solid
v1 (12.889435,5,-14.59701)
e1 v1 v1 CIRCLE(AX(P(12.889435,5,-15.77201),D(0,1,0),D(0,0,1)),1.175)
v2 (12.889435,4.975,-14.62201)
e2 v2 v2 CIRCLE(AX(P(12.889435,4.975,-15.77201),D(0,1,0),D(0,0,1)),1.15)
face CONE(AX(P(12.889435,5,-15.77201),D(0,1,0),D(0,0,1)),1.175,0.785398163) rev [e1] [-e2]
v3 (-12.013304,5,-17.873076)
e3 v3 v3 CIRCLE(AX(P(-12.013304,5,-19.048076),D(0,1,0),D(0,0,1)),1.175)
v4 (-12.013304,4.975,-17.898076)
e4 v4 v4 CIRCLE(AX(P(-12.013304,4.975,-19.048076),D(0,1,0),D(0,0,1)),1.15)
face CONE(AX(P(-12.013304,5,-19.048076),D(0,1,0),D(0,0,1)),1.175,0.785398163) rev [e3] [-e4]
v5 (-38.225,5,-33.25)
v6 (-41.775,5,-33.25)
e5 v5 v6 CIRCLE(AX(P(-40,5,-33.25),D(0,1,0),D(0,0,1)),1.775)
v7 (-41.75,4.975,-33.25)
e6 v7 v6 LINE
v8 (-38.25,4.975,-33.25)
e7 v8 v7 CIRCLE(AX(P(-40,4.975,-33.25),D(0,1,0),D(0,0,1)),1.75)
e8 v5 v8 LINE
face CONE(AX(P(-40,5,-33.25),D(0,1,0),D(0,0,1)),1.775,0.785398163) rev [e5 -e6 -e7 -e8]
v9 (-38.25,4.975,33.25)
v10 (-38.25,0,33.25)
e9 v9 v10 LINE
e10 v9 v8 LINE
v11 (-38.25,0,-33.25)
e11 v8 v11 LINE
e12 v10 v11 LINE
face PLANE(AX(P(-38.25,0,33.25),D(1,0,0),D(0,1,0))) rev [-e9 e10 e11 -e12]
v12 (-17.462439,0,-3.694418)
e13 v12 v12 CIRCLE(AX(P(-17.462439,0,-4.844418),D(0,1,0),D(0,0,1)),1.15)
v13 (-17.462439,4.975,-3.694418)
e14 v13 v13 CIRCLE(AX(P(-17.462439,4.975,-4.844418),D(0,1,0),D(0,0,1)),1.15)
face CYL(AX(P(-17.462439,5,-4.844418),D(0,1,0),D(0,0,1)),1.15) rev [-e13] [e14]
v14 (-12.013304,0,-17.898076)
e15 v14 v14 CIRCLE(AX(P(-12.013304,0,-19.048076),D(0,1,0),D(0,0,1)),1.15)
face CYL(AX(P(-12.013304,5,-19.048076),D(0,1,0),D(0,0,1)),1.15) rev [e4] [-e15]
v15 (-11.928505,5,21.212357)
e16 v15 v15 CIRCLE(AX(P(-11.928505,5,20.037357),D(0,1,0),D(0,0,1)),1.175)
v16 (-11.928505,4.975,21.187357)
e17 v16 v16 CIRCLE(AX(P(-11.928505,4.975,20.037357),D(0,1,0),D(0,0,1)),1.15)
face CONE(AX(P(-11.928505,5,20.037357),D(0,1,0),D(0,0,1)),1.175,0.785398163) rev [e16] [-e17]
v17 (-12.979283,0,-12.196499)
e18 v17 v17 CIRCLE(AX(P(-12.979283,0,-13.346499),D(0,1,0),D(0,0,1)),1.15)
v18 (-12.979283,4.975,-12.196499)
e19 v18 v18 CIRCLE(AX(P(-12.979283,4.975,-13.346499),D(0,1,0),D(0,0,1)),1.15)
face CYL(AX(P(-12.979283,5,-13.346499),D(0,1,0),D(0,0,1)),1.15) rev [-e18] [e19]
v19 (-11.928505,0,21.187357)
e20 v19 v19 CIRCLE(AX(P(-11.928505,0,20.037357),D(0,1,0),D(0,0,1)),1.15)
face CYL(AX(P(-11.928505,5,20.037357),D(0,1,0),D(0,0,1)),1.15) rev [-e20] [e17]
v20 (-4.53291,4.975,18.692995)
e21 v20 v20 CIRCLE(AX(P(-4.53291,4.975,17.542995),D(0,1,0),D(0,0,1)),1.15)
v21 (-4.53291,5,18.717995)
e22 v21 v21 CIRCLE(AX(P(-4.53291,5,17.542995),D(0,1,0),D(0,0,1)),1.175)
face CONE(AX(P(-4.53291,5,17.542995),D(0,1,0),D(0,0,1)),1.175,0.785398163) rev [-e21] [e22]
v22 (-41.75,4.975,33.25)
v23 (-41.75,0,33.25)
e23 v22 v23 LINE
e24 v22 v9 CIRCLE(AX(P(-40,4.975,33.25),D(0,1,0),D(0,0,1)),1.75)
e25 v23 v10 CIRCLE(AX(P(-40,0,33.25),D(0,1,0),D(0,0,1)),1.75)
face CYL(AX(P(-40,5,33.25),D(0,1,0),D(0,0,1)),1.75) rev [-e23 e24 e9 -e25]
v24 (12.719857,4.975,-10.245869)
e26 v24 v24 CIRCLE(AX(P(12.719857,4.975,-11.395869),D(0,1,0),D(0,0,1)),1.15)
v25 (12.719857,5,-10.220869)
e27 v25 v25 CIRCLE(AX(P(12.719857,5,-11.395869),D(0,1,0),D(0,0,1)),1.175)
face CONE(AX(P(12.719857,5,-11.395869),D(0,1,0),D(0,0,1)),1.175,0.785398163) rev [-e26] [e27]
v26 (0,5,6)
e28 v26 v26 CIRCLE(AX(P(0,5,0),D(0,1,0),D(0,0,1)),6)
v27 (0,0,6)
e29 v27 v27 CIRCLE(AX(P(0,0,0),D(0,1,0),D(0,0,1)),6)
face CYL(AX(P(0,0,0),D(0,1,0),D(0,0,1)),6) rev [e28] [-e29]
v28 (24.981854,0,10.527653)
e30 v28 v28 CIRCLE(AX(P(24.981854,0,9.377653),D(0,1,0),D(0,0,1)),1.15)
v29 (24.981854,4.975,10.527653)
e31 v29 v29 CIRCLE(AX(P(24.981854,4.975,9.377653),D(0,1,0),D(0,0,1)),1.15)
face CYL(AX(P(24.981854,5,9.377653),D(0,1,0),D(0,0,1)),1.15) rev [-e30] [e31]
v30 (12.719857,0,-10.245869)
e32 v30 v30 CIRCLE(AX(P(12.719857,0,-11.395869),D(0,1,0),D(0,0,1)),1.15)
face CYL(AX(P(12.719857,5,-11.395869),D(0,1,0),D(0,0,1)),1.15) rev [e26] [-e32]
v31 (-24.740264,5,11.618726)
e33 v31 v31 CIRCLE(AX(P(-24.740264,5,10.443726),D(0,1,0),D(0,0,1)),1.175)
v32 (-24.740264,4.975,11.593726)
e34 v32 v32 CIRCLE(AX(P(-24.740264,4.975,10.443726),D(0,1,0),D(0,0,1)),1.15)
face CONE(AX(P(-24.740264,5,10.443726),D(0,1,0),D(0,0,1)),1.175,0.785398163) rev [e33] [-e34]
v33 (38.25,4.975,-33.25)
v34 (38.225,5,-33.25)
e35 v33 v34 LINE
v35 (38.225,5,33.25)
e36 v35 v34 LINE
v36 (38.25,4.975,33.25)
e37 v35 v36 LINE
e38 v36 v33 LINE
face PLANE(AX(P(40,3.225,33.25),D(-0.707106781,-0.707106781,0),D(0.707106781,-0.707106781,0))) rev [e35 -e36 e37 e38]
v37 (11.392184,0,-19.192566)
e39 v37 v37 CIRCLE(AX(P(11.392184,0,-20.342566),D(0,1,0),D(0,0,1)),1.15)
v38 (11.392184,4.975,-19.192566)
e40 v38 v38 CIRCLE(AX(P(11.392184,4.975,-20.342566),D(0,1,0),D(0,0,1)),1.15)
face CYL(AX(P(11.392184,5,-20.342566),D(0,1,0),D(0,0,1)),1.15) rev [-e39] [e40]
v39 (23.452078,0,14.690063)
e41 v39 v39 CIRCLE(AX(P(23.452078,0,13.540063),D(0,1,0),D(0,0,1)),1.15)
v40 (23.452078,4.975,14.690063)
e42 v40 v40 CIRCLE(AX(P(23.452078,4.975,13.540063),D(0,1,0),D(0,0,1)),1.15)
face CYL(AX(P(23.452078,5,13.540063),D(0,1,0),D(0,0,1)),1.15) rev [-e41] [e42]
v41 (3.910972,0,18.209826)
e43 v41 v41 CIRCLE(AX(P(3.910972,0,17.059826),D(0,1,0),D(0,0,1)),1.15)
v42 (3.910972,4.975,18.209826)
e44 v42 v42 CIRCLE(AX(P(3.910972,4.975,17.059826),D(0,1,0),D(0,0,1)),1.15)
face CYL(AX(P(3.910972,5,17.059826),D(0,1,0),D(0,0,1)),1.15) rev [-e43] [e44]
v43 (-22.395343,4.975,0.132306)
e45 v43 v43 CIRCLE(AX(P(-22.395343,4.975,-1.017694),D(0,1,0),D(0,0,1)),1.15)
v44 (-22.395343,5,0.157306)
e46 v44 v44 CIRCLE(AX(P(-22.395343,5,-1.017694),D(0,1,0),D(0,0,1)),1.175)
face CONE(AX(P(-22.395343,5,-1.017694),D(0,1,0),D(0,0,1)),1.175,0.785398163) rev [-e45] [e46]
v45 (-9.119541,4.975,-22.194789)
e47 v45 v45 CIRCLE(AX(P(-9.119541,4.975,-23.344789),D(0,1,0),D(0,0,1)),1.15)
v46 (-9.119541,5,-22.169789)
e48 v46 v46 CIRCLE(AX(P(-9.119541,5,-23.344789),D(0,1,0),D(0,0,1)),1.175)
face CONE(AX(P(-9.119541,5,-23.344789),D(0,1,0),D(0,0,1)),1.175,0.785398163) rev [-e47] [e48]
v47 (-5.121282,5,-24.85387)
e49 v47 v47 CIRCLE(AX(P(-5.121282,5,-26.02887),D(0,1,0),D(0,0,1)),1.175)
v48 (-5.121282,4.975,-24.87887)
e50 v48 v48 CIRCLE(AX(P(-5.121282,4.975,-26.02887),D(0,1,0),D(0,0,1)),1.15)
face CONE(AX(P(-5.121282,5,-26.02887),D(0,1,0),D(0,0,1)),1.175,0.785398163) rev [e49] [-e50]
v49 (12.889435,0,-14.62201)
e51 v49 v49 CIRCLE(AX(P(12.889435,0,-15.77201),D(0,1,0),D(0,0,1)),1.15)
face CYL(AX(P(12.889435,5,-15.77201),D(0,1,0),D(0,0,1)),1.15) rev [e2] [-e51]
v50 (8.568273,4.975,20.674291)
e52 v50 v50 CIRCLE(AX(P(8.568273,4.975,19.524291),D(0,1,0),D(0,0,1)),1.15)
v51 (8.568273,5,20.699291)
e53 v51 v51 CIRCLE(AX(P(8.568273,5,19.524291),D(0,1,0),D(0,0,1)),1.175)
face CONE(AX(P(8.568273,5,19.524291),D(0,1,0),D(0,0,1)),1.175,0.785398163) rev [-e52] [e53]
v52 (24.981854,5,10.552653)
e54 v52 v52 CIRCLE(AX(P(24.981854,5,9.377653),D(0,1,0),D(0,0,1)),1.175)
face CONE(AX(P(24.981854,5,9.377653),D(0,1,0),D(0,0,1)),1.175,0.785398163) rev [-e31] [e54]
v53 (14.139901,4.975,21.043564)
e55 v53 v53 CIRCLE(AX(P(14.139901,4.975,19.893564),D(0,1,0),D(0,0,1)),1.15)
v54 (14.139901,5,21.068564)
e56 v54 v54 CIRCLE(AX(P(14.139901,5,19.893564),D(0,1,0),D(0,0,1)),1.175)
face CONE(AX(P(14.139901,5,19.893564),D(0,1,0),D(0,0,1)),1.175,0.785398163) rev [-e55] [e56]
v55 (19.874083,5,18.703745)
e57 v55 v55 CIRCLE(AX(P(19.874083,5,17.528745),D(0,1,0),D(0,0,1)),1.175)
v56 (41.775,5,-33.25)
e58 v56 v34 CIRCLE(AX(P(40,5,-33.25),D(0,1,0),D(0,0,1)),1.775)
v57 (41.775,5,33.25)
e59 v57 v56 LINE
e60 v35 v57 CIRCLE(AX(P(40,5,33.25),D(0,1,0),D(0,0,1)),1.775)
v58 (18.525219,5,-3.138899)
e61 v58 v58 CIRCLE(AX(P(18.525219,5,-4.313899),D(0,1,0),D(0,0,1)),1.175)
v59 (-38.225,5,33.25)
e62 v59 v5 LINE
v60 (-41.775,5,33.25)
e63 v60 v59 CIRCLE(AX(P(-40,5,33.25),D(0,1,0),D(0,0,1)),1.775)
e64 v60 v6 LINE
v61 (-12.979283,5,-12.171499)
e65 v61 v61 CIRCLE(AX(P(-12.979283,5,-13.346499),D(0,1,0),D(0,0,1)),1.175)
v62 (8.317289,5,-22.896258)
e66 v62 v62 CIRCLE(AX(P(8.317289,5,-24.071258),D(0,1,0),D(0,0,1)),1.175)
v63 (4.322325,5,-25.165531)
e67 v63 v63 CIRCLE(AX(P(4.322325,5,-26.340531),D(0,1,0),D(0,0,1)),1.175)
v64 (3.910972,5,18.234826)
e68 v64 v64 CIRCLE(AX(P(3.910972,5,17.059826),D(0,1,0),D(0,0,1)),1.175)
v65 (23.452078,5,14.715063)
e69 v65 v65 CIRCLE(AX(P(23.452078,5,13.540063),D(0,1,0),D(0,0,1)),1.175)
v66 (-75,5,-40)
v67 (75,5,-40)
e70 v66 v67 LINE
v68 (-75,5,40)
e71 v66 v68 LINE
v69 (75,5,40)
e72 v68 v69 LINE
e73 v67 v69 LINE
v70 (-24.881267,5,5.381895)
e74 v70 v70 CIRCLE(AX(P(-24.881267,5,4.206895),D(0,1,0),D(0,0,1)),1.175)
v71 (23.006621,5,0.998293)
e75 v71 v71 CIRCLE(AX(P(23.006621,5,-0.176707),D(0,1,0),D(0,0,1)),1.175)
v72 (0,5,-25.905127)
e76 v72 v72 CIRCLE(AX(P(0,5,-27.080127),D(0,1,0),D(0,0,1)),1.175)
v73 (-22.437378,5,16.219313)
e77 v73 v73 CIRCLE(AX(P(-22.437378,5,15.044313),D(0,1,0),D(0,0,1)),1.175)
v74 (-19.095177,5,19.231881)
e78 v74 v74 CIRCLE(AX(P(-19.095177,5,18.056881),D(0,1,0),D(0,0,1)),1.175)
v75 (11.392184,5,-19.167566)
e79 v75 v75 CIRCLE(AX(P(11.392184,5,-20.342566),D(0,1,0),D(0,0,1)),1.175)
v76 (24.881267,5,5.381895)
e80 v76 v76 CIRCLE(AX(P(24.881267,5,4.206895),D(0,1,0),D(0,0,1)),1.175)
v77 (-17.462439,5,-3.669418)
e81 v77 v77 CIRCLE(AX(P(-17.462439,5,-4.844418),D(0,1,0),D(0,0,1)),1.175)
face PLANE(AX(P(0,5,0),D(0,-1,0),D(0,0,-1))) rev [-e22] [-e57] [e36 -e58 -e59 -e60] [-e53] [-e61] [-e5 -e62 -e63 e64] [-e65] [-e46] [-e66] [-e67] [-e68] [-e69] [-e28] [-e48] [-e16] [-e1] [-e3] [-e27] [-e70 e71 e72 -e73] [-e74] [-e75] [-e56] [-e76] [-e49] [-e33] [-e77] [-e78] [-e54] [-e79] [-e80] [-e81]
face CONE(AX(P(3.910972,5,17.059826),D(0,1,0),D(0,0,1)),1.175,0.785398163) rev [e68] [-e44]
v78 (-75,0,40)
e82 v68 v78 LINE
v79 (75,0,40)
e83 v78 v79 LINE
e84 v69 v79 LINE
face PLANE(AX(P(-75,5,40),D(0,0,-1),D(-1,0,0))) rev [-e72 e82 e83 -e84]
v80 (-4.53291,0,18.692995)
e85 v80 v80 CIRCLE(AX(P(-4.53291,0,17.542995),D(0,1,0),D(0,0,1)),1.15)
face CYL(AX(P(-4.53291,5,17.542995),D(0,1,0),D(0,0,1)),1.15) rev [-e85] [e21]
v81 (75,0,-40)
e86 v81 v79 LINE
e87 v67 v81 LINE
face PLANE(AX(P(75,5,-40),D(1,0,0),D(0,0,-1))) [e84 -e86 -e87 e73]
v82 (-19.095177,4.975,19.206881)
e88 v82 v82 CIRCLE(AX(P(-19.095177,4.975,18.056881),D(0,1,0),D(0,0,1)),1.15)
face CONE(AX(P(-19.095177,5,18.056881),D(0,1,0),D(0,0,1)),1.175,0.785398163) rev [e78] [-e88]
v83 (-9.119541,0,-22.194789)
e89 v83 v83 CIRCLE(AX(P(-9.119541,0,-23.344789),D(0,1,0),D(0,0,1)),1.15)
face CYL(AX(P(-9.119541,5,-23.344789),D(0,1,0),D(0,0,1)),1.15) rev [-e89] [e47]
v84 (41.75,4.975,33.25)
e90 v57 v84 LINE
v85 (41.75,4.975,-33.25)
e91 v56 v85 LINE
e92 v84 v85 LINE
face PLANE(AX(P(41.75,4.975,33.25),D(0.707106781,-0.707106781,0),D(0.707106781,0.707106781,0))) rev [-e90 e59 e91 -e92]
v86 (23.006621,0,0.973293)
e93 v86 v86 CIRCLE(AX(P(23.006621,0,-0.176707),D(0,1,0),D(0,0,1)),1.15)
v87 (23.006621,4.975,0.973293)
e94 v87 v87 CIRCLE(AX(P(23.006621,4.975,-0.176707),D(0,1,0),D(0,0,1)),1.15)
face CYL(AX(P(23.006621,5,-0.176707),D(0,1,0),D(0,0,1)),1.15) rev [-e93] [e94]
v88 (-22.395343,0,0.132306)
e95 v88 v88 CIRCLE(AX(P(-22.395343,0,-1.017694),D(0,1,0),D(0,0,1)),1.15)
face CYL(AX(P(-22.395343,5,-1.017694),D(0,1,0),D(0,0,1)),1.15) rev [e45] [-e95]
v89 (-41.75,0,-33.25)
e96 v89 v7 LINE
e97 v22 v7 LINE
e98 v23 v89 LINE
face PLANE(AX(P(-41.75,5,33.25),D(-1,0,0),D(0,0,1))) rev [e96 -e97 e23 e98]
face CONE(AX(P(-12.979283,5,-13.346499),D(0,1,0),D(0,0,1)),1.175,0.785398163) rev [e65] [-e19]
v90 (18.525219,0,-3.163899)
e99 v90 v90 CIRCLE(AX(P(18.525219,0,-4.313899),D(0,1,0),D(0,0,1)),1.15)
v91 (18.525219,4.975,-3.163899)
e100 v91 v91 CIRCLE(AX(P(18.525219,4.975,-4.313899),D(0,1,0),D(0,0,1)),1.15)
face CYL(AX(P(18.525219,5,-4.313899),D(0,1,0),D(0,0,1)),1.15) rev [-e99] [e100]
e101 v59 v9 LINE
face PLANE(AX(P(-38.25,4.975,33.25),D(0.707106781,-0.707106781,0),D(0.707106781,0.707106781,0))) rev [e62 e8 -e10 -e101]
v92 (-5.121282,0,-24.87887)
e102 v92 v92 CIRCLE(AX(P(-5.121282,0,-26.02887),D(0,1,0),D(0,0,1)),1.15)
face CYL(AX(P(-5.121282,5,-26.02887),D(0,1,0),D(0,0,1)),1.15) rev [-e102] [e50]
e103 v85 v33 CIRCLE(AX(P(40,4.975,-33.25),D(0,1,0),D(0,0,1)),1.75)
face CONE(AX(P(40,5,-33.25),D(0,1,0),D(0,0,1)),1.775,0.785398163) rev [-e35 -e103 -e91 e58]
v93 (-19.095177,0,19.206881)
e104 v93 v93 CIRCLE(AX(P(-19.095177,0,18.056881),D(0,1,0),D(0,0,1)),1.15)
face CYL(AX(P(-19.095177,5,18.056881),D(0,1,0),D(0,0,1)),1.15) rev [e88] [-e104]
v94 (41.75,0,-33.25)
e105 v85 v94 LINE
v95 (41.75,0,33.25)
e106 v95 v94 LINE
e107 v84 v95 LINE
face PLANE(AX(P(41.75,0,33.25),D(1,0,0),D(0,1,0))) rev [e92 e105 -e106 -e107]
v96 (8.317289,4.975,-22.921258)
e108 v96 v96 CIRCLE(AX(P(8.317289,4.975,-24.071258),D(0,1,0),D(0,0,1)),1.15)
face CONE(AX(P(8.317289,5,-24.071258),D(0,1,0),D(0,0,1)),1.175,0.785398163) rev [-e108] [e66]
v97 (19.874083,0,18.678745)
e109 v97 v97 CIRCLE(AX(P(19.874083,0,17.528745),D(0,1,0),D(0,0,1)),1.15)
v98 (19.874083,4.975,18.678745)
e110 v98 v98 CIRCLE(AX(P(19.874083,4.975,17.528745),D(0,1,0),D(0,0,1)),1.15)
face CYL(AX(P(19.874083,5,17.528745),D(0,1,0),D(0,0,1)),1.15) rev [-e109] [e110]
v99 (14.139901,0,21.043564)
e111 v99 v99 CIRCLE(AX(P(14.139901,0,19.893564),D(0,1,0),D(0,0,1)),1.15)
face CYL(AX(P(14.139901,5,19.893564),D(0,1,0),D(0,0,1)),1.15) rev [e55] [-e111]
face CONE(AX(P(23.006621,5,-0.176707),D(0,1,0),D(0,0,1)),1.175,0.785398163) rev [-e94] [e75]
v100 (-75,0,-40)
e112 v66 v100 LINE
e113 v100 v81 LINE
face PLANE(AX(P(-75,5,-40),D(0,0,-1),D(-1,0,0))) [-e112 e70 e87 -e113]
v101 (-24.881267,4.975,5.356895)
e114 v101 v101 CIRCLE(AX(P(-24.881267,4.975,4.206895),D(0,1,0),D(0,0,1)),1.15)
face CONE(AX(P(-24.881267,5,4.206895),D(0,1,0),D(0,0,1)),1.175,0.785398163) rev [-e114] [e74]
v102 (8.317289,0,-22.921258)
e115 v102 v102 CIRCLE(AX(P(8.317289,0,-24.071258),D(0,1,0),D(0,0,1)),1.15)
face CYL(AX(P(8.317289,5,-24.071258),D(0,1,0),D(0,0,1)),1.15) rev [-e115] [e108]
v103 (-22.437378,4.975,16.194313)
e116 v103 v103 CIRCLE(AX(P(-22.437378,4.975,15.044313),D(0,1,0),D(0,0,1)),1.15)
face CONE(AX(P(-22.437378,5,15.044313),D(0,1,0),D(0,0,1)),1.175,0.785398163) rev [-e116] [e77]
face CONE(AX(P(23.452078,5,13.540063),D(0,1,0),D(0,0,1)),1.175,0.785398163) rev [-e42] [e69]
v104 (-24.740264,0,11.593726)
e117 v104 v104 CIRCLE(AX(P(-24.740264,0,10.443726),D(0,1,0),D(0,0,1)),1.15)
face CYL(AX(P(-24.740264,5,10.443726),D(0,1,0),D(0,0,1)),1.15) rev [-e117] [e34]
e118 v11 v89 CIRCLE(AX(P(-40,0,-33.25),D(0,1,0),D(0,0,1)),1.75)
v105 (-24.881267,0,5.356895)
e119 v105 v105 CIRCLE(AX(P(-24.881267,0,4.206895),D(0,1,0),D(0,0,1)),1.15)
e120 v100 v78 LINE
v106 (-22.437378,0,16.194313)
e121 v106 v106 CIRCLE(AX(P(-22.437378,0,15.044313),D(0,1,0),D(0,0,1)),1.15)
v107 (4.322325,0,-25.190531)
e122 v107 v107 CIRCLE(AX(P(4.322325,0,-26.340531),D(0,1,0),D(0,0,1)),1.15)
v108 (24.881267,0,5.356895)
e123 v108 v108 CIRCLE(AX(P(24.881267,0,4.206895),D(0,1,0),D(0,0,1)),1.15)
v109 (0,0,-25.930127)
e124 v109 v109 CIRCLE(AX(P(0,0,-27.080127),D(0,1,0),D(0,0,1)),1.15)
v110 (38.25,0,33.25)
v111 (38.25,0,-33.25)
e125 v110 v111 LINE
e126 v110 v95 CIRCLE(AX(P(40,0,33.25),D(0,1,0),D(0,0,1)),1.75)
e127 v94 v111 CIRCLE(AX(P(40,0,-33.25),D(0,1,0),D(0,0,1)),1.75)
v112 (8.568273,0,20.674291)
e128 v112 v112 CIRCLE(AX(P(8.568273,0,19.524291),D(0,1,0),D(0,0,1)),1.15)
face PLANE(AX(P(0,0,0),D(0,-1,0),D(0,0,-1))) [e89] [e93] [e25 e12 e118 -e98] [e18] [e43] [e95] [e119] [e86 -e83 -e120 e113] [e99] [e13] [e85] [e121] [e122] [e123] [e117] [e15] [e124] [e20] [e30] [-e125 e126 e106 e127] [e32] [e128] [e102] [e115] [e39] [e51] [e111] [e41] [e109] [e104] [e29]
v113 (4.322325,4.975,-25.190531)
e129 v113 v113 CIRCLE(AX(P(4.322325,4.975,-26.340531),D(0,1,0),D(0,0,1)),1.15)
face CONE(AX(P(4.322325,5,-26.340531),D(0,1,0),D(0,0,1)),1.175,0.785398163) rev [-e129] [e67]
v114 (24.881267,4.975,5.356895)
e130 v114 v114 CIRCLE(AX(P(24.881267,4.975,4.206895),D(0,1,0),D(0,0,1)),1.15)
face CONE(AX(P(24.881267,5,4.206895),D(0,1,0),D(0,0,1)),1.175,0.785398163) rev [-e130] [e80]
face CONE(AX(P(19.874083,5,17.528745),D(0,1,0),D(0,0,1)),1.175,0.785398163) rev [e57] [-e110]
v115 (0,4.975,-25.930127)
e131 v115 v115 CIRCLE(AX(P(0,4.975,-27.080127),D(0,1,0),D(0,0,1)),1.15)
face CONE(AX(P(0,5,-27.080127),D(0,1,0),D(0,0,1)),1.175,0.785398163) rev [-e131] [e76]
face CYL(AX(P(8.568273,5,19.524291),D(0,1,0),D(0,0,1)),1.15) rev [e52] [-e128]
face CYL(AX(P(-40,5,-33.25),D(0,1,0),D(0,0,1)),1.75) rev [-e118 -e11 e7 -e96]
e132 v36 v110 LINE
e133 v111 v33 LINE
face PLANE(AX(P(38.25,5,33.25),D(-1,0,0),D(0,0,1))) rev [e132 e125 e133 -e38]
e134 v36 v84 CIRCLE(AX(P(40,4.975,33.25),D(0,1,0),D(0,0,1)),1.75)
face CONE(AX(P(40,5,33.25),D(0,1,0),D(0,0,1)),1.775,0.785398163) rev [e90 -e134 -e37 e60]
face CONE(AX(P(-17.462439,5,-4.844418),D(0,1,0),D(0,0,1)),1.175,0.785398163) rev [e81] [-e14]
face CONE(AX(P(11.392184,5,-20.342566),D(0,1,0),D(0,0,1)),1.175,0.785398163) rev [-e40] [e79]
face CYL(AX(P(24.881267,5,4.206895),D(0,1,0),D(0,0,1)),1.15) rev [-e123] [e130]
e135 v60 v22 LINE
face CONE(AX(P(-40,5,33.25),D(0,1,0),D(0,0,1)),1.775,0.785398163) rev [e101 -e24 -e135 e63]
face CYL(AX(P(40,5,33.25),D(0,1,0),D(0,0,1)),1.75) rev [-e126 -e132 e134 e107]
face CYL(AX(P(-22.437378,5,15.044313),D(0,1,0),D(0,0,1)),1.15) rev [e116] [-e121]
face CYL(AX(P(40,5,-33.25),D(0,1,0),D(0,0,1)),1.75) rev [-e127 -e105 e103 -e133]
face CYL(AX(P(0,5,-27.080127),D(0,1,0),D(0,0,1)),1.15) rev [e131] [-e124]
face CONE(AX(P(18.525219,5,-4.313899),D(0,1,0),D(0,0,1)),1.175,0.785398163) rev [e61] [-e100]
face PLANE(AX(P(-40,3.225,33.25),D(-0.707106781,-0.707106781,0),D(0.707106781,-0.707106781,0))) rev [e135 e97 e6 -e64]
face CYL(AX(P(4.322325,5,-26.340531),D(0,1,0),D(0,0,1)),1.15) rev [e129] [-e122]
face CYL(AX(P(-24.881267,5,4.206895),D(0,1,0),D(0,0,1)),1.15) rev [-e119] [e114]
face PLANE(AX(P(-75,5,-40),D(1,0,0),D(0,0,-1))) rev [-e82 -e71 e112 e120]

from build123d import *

# Parameters (mm, degrees)
SKETCH1_W                            = 150
SKETCH1_H                            = 80
BOSS_EXTRUDE1_DEPTH                  = 5
SKETCH2_R                            = 6
CUT_EXTRUDE1_DEPTH                   = 5
F_2_3_2_3_DIAMETER_HOLE1_D           = 2.3
F_2_3_2_3_DIAMETER_HOLE1_CSINK_D     = 2.35
F_2_3_2_3_DIAMETER_HOLE1_CSINK_ANGLE = 90
F_3_5_START                          = -1
F_3_5_3_5_DIAMETER_SLOT1_DEPTH       = 7


with BuildPart() as part:
    # Sketch1 → Boss-Extrude1 (new body)
    with BuildSketch(Plane(origin=(0, 0, 0), x_dir=(1, 0, 0), z_dir=(0, 1, 0))):
        Rectangle(SKETCH1_W, SKETCH1_H)
    extrude(amount=BOSS_EXTRUDE1_DEPTH)

    # Sketch2 → Cut-Extrude1 (cut)
    with BuildSketch(Plane(origin=(0, 5, 0), x_dir=(1, 0, 0), z_dir=(0, 1, 0))):
        with Locations(Location((0, 0, 0), (0, 0, 270))):
            Circle(SKETCH2_R)
    extrude(amount=-CUT_EXTRUDE1_DEPTH, mode=Mode.SUBTRACT)

    # Ø2.3 (2.3) Diameter Hole1 (through all)
    with Locations(Plane(origin=(0, 5, 0), x_dir=(1, 0, 0), z_dir=(0, 1, 0))):
        with Locations((18.525219477, 4.313899021), (-12.013304258, 19.048075911), (-12.979283121, 13.346498811), (-9.119541427, 23.344788673), (-5.121281637, 26.028870187), (0, 27.080126555), (4.322325112, 26.34053053), (8.317289006, 24.071257802), (11.39218392, 20.342565819), (12.889434778, 15.772010445), (12.719856903, 11.395868677), (-22.39534299, 1.017693549), (-24.881267093, -4.206895241), (-24.740263888, -10.443726178), (-22.437378406, -15.04431349), (-19.095176636, -18.056881008), (-17.46243869, 4.844417817), (-4.532909997, -17.54299487), (-11.928504706, -20.037357087), (3.910972218, -17.05982561), (8.568273344, -19.524290875), (14.139900873, -19.89356421), (19.874082729, -17.528745152), (23.452077534, -13.540063277), (24.981853962, -9.377653409), (24.881267093, -4.206895241), (23.006620796, 0.176706529)):
            CounterSinkHole(F_2_3_2_3_DIAMETER_HOLE1_D / 2, F_2_3_2_3_DIAMETER_HOLE1_CSINK_D / 2, counter_sink_angle=F_2_3_2_3_DIAMETER_HOLE1_CSINK_ANGLE)

    # Ø3.5 (3.5) Diameter Slot1: read off the stored shape, not the designer's step
    # Ø3.5 (3.5) Diameter Slot1 outline → Ø3.5 (3.5) Diameter Slot1 (cut)
    with BuildSketch(Plane(origin=(0, 0, 0), x_dir=(1, 0, 0), z_dir=(0, 1, 0)).offset(F_3_5_START)):
        with BuildLine():
            Line((41.75, -33.25), (41.75, 33.25))
            ThreePointArc((41.75, 33.25), (40, 35), (38.25, 33.25))
            Line((38.25, 33.25), (38.25, -33.25))
            ThreePointArc((38.25, -33.25), (40, -35), (41.75, -33.25))
        make_face()
        with BuildLine():
            Line((-38.25, -33.25), (-38.25, 33.25))
            ThreePointArc((-38.25, 33.25), (-40, 35), (-41.75, 33.25))
            Line((-41.75, 33.25), (-41.75, -33.25))
            ThreePointArc((-41.75, -33.25), (-40, -35), (-38.25, -33.25))
        make_face()
    extrude(amount=F_3_5_3_5_DIAMETER_SLOT1_DEPTH, mode=Mode.SUBTRACT)

    # 3.5 _3.5_ Diameter Slot1 2: loft between two sections, ruled curve by curve
    f_3_5_3_5_diameter_slot1_2_from = [
        Edge.make_three_point_arc((41.75, 4.975, -33.25), (41.237436867, 4.975, -34.487436867), (40, 4.975, -35)),
        Edge.make_three_point_arc((40, 4.975, -35), (38.762563133, 4.975, -34.487436867), (38.25, 4.975, -33.25)),
        Edge.make_three_point_arc((38.25, 4.975, 33.25), (38.762563133, 4.975, 34.487436867), (40, 4.975, 35)),
        Edge.make_three_point_arc((40, 4.975, 35), (41.237436867, 4.975, 34.487436867), (41.75, 4.975, 33.25)),
        Edge.make_line((38.25, 4.975, -33.25), (38.25, 4.975, 33.25)),
        Edge.make_line((41.75, 4.975, -33.25), (41.75, 4.975, 33.25)),
    ]
    f_3_5_3_5_diameter_slot1_2_to = [
        Edge.make_three_point_arc((41.775, 5, -33.25), (41.255114537, 5, -34.505114537), (40, 5, -35.025)),
        Edge.make_three_point_arc((40, 5, -35.025), (38.744885463, 5, -34.505114537), (38.225, 5, -33.25)),
        Edge.make_three_point_arc((38.225, 5, 33.25), (38.744885463, 5, 34.505114537), (40, 5, 35.025)),
        Edge.make_three_point_arc((40, 5, 35.025), (41.255114537, 5, 34.505114537), (41.775, 5, 33.25)),
        Edge.make_line((38.225, 5, -33.25), (38.225, 5, 33.25)),
        Edge.make_line((41.775, 5, -33.25), (41.775, 5, 33.25)),
    ]
    f_3_5_3_5_diameter_slot1_2 = Solid(Shell([*[Face.make_surface_from_curves(f_3_5_3_5_diameter_slot1_2_from[k], f_3_5_3_5_diameter_slot1_2_to[k]) for k in range(6)], Face(Wire(f_3_5_3_5_diameter_slot1_2_from)), Face(Wire(f_3_5_3_5_diameter_slot1_2_to))]))
    add(f_3_5_3_5_diameter_slot1_2, mode=Mode.SUBTRACT)

    # 3.5 _3.5_ Diameter Slot1 3: loft between two sections, ruled curve by curve
    f_3_5_3_5_diameter_slot1_3_from = [
        Edge.make_three_point_arc((-38.25, 4.975, -33.25), (-38.762563133, 4.975, -34.487436867), (-40, 4.975, -35)),
        Edge.make_three_point_arc((-40, 4.975, -35), (-41.237436867, 4.975, -34.487436867), (-41.75, 4.975, -33.25)),
        Edge.make_three_point_arc((-41.75, 4.975, 33.25), (-41.237436867, 4.975, 34.487436867), (-40, 4.975, 35)),
        Edge.make_three_point_arc((-40, 4.975, 35), (-38.762563133, 4.975, 34.487436867), (-38.25, 4.975, 33.25)),
        Edge.make_line((-41.75, 4.975, -33.25), (-41.75, 4.975, 33.25)),
        Edge.make_line((-38.25, 4.975, -33.25), (-38.25, 4.975, 33.25)),
    ]
    f_3_5_3_5_diameter_slot1_3_to = [
        Edge.make_three_point_arc((-38.225, 5, -33.25), (-38.744885463, 5, -34.505114537), (-40, 5, -35.025)),
        Edge.make_three_point_arc((-40, 5, -35.025), (-41.255114537, 5, -34.505114537), (-41.775, 5, -33.25)),
        Edge.make_three_point_arc((-41.775, 5, 33.25), (-41.255114537, 5, 34.505114537), (-40, 5, 35.025)),
        Edge.make_three_point_arc((-40, 5, 35.025), (-38.744885463, 5, 34.505114537), (-38.225, 5, 33.25)),
        Edge.make_line((-41.775, 5, -33.25), (-41.775, 5, 33.25)),
        Edge.make_line((-38.225, 5, -33.25), (-38.225, 5, 33.25)),
    ]
    f_3_5_3_5_diameter_slot1_3 = Solid(Shell([*[Face.make_surface_from_curves(f_3_5_3_5_diameter_slot1_3_from[k], f_3_5_3_5_diameter_slot1_3_to[k]) for k in range(6)], Face(Wire(f_3_5_3_5_diameter_slot1_3_from)), Face(Wire(f_3_5_3_5_diameter_slot1_3_to))]))
    add(f_3_5_3_5_diameter_slot1_3, mode=Mode.SUBTRACT)


solid = part.part
